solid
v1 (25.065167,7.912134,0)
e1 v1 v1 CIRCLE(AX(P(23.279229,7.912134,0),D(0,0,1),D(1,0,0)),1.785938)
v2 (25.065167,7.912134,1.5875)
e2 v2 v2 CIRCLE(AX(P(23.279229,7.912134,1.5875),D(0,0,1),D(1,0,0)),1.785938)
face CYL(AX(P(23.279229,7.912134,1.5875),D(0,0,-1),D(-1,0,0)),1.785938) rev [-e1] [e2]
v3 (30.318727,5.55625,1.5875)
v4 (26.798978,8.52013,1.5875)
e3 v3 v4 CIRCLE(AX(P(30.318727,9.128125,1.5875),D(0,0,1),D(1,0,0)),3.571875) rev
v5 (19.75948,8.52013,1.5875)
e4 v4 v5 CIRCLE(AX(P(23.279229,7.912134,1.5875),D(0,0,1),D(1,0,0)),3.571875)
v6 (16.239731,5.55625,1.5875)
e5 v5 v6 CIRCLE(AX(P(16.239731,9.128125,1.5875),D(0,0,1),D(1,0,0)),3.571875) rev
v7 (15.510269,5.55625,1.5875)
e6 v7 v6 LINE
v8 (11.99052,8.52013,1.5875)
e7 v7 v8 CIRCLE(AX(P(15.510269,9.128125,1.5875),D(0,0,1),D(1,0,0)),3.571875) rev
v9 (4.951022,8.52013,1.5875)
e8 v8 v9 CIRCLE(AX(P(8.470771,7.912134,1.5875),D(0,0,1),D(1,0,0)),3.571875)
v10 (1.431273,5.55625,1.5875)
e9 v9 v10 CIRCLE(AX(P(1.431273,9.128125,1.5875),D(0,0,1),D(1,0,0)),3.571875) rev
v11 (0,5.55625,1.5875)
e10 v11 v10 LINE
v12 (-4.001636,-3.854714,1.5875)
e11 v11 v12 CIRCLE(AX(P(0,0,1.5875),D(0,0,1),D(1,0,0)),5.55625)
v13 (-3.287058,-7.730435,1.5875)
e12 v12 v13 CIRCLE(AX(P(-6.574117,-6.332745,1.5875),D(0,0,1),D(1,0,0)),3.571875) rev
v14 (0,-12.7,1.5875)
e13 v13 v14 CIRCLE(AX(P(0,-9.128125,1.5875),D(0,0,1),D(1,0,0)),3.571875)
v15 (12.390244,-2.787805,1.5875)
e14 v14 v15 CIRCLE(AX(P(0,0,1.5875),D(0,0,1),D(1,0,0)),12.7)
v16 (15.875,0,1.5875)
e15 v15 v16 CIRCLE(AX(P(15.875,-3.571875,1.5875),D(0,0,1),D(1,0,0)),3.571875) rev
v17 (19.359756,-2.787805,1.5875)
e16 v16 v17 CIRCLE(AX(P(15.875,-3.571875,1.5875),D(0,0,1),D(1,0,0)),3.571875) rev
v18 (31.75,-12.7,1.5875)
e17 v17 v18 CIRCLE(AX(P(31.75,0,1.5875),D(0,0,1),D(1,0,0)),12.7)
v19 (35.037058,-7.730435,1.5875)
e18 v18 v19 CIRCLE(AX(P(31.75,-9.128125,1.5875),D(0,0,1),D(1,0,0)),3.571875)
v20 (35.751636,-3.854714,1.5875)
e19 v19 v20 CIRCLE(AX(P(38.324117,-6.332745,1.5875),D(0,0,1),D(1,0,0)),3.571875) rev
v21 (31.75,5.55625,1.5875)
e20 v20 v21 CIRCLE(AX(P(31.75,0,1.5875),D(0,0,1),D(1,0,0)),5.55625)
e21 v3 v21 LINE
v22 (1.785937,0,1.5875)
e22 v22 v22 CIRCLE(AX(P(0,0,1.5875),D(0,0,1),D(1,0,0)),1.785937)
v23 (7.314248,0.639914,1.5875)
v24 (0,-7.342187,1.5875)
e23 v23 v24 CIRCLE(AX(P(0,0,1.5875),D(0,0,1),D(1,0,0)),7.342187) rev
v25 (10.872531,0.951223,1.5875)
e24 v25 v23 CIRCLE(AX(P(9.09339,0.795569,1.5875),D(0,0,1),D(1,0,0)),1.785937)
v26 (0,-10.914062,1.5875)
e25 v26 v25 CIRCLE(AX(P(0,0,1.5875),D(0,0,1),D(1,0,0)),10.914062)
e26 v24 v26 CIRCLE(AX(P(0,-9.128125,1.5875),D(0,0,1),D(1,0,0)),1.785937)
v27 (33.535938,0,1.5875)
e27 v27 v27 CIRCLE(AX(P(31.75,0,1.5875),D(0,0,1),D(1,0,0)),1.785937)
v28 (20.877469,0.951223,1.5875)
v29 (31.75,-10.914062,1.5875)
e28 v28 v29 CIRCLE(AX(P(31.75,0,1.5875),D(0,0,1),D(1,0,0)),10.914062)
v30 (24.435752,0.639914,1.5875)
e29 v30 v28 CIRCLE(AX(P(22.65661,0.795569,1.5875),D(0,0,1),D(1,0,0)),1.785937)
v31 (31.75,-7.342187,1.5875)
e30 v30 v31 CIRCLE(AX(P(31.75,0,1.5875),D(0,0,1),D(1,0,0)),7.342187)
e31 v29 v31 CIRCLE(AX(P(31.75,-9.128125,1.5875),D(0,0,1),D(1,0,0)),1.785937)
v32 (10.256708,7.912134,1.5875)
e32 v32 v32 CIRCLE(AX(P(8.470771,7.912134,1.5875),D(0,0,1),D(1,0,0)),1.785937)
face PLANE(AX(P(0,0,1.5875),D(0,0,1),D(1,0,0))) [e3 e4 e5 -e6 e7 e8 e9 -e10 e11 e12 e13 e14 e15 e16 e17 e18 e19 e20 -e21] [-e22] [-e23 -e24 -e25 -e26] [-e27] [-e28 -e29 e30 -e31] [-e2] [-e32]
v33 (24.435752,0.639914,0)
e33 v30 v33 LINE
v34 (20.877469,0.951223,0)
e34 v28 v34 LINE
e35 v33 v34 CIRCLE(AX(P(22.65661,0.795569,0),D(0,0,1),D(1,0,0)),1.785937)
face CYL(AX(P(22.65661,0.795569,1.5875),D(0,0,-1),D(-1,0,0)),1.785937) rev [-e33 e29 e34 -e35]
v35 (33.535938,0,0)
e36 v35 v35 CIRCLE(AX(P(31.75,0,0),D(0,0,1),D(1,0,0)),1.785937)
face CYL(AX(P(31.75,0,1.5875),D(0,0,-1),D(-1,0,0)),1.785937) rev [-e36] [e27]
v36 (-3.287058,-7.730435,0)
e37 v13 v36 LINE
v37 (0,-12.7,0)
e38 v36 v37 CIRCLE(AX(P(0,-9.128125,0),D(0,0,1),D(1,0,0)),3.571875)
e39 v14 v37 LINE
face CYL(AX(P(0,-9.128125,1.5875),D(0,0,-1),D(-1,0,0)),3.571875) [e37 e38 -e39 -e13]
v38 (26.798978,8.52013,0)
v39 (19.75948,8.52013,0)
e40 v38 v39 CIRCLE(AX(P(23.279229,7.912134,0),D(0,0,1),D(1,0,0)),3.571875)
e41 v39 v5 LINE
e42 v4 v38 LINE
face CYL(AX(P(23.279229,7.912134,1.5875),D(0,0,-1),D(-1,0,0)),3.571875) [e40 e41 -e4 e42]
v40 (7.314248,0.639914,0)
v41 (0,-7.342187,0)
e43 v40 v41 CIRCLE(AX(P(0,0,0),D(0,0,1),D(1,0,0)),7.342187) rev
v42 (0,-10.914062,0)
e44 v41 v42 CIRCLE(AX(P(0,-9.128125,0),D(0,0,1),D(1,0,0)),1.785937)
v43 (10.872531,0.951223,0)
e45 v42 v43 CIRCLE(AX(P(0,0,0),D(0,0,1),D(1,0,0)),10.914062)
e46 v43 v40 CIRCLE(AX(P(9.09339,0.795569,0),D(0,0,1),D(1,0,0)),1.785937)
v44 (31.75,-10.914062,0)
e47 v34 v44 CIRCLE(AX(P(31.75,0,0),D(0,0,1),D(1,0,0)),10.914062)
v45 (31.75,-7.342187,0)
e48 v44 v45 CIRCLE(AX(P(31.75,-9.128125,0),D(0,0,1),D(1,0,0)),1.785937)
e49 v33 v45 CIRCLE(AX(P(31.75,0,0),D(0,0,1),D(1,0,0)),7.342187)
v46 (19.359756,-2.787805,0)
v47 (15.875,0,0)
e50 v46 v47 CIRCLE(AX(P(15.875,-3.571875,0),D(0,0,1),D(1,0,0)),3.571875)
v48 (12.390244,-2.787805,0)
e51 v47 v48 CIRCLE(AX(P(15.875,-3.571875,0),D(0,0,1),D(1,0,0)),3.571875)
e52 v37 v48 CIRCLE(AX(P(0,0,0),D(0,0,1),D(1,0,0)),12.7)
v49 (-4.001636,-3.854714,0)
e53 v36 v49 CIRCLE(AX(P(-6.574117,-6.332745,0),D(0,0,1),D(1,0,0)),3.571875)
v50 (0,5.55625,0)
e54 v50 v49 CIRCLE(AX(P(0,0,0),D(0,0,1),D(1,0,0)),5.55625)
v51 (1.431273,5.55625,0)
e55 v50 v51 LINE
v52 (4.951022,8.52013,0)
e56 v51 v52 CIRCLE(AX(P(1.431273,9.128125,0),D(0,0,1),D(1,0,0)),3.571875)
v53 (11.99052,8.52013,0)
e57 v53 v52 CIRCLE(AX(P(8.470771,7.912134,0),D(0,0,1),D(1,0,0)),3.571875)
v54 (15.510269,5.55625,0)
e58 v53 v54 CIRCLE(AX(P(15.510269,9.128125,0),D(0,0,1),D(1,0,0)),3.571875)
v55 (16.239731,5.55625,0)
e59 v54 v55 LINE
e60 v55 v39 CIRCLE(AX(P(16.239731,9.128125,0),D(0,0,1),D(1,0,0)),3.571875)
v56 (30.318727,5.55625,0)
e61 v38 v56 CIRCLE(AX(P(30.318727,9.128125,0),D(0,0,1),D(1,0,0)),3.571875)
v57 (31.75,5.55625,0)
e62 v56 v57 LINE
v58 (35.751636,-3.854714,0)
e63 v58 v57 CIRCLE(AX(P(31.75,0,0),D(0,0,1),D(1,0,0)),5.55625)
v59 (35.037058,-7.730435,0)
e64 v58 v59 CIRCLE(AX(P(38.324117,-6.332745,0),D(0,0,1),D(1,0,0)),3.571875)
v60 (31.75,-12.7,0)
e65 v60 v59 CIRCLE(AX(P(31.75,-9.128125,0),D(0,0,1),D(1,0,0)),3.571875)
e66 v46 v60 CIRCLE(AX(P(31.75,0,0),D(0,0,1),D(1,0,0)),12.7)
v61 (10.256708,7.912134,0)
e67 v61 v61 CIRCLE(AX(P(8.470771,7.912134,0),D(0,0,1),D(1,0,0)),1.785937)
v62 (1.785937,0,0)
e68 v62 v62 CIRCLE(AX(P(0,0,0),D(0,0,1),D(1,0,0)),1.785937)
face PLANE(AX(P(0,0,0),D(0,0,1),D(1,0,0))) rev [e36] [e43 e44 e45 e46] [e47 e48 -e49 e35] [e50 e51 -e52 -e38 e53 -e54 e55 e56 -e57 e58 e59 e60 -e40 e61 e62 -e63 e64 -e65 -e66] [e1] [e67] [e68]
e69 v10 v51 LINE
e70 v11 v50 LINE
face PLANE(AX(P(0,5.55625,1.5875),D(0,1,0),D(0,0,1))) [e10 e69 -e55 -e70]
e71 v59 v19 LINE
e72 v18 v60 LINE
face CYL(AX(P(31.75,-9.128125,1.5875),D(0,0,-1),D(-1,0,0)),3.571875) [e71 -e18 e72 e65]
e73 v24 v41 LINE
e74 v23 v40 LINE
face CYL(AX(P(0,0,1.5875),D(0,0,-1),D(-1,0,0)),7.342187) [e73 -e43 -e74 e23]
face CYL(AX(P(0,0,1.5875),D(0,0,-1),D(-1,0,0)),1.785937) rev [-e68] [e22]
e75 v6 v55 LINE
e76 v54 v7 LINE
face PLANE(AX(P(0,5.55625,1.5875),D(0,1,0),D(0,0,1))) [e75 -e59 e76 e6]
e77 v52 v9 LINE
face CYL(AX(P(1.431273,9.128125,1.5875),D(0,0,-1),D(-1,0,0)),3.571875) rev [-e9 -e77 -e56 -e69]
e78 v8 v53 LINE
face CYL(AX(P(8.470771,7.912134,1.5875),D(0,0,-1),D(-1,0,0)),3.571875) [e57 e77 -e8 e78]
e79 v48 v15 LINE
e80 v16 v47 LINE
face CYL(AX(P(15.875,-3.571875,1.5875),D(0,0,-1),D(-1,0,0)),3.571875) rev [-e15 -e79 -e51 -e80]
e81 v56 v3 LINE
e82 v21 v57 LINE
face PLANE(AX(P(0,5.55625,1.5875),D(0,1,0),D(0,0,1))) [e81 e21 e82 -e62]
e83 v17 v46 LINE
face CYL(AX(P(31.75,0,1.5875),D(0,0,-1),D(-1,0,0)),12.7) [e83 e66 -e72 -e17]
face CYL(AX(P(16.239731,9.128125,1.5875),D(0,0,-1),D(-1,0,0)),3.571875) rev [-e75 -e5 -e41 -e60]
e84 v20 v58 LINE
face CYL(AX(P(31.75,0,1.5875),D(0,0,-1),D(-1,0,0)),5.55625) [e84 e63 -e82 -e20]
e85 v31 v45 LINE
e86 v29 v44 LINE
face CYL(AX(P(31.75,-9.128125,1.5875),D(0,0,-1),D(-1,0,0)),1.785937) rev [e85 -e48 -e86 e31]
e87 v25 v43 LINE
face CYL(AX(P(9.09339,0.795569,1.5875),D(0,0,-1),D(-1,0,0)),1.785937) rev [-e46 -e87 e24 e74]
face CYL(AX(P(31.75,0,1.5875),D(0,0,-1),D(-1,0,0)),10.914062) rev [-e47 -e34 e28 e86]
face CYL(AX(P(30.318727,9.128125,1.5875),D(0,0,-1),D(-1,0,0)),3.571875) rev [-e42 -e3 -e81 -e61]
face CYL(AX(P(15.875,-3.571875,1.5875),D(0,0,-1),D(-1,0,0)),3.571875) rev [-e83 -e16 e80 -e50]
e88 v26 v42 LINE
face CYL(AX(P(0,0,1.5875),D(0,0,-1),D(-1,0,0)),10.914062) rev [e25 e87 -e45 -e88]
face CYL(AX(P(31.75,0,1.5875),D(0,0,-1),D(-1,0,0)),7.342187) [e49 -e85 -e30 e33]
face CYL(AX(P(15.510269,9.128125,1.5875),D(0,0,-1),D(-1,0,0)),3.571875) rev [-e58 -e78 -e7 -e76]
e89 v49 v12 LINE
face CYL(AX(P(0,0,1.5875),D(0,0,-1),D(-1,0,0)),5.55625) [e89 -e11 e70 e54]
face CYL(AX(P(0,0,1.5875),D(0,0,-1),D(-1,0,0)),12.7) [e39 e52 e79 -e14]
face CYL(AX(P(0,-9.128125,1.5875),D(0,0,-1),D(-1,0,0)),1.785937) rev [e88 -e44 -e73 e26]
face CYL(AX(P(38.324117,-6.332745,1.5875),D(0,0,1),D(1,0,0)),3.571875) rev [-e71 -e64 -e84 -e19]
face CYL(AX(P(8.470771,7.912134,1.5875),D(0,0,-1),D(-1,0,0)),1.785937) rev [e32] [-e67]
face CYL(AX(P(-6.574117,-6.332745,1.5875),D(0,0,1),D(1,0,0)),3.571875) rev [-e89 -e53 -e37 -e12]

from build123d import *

# Parameters (mm, degrees)
SKETCH1_R           = 1.7859375
BOSS_EXTRUDE1_DEPTH = 1.5875
FILLET1_R           = 3.571875


with BuildPart() as part:
    # Sketch1 → Boss-Extrude1 (new body)
    with BuildSketch(Plane.XY):
        with BuildLine():
            ThreePointArc((31.75, -12.7), (35.321875, -9.128125), (31.75, -5.55625))
            ThreePointArc((31.75, -5.55625), (37.30625, 0), (31.75, 5.55625))
            Line((31.75, 5.55625), (25.964019559, 5.55625))
            ThreePointArc((25.964019559, 5.55625), (23.279229109, 11.484009389), (20.594438658, 5.55625))
            Line((20.594438658, 5.55625), (11.155561342, 5.55625))
            ThreePointArc((11.155561342, 5.55625), (8.470770891, 11.484009389), (5.785980441, 5.55625))
            Line((5.785980441, 5.55625), (0, 5.55625))
            ThreePointArc((0, 5.55625), (-5.55625, 0), (0, -5.55625))
            ThreePointArc((0, -5.55625), (-3.571875, -9.128125), (0, -12.7))
            ThreePointArc((0, -12.7), (8.980256121, -8.980256121), (12.7, 0))
            Line((12.7, 0), (19.05, 0))
            ThreePointArc((19.05, 0), (22.769743879, -8.980256121), (31.75, -12.7))
        make_face()
        with BuildLine():
            ThreePointArc((0, -10.9140625), (-1.7859375, -9.128125), (0, -7.3421875))
            ThreePointArc((0, -7.3421875), (5.413228446, -4.960309977), (7.31424826, 0.639913805))
            ThreePointArc((7.31424826, 0.639913805), (8.937735019, 2.574709983), (10.872531197, 0.951223224))
            ThreePointArc((10.872531197, 0.951223224), (8.046690934, -7.37343375), (0, -10.9140625))
        make_face(mode=Mode.SUBTRACT)
        with BuildLine():
            ThreePointArc((24.43575174, 0.639913805), (26.336771554, -4.960309977), (31.75, -7.3421875))
            ThreePointArc((31.75, -7.3421875), (33.5359375, -9.128125), (31.75, -10.9140625))
            ThreePointArc((31.75, -10.9140625), (23.703309066, -7.37343375), (20.877468803, 0.951223224))
            ThreePointArc((20.877468803, 0.951223224), (22.812264981, 2.574709983), (24.43575174, 0.639913805))
        make_face(mode=Mode.SUBTRACT)
        Circle(SKETCH1_R, mode=Mode.SUBTRACT)
        with Locations((8.470770891, 7.912134389)):
            Circle(SKETCH1_R, mode=Mode.SUBTRACT)
        with Locations((31.75, 0)):
            Circle(SKETCH1_R, mode=Mode.SUBTRACT)
        with Locations((23.279229109, 7.912134389)):
            Circle(SKETCH1_R, mode=Mode.SUBTRACT)
    extrude(amount=BOSS_EXTRUDE1_DEPTH)

    # Fillet1
    fillet1_edges = [part.edges().sort_by_distance(p)[0] for p in [
        (31.75, -5.55625, 0.79375),
        (19.05, 0, 0.79375),
        (12.7, 0, 0.79375),
        (0, -5.55625, 0.79375),
        (20.594438658, 5.55625, 0.79375),
        (25.964019559, 5.55625, 0.79375),
        (5.785980441, 5.55625, 0.79375),
        (11.155561342, 5.55625, 0.79375),
    ]]
    fillet(fillet1_edges, radius=FILLET1_R - 0.0001)  # a hair under: the kernel refuses the full size


solid = part.part
